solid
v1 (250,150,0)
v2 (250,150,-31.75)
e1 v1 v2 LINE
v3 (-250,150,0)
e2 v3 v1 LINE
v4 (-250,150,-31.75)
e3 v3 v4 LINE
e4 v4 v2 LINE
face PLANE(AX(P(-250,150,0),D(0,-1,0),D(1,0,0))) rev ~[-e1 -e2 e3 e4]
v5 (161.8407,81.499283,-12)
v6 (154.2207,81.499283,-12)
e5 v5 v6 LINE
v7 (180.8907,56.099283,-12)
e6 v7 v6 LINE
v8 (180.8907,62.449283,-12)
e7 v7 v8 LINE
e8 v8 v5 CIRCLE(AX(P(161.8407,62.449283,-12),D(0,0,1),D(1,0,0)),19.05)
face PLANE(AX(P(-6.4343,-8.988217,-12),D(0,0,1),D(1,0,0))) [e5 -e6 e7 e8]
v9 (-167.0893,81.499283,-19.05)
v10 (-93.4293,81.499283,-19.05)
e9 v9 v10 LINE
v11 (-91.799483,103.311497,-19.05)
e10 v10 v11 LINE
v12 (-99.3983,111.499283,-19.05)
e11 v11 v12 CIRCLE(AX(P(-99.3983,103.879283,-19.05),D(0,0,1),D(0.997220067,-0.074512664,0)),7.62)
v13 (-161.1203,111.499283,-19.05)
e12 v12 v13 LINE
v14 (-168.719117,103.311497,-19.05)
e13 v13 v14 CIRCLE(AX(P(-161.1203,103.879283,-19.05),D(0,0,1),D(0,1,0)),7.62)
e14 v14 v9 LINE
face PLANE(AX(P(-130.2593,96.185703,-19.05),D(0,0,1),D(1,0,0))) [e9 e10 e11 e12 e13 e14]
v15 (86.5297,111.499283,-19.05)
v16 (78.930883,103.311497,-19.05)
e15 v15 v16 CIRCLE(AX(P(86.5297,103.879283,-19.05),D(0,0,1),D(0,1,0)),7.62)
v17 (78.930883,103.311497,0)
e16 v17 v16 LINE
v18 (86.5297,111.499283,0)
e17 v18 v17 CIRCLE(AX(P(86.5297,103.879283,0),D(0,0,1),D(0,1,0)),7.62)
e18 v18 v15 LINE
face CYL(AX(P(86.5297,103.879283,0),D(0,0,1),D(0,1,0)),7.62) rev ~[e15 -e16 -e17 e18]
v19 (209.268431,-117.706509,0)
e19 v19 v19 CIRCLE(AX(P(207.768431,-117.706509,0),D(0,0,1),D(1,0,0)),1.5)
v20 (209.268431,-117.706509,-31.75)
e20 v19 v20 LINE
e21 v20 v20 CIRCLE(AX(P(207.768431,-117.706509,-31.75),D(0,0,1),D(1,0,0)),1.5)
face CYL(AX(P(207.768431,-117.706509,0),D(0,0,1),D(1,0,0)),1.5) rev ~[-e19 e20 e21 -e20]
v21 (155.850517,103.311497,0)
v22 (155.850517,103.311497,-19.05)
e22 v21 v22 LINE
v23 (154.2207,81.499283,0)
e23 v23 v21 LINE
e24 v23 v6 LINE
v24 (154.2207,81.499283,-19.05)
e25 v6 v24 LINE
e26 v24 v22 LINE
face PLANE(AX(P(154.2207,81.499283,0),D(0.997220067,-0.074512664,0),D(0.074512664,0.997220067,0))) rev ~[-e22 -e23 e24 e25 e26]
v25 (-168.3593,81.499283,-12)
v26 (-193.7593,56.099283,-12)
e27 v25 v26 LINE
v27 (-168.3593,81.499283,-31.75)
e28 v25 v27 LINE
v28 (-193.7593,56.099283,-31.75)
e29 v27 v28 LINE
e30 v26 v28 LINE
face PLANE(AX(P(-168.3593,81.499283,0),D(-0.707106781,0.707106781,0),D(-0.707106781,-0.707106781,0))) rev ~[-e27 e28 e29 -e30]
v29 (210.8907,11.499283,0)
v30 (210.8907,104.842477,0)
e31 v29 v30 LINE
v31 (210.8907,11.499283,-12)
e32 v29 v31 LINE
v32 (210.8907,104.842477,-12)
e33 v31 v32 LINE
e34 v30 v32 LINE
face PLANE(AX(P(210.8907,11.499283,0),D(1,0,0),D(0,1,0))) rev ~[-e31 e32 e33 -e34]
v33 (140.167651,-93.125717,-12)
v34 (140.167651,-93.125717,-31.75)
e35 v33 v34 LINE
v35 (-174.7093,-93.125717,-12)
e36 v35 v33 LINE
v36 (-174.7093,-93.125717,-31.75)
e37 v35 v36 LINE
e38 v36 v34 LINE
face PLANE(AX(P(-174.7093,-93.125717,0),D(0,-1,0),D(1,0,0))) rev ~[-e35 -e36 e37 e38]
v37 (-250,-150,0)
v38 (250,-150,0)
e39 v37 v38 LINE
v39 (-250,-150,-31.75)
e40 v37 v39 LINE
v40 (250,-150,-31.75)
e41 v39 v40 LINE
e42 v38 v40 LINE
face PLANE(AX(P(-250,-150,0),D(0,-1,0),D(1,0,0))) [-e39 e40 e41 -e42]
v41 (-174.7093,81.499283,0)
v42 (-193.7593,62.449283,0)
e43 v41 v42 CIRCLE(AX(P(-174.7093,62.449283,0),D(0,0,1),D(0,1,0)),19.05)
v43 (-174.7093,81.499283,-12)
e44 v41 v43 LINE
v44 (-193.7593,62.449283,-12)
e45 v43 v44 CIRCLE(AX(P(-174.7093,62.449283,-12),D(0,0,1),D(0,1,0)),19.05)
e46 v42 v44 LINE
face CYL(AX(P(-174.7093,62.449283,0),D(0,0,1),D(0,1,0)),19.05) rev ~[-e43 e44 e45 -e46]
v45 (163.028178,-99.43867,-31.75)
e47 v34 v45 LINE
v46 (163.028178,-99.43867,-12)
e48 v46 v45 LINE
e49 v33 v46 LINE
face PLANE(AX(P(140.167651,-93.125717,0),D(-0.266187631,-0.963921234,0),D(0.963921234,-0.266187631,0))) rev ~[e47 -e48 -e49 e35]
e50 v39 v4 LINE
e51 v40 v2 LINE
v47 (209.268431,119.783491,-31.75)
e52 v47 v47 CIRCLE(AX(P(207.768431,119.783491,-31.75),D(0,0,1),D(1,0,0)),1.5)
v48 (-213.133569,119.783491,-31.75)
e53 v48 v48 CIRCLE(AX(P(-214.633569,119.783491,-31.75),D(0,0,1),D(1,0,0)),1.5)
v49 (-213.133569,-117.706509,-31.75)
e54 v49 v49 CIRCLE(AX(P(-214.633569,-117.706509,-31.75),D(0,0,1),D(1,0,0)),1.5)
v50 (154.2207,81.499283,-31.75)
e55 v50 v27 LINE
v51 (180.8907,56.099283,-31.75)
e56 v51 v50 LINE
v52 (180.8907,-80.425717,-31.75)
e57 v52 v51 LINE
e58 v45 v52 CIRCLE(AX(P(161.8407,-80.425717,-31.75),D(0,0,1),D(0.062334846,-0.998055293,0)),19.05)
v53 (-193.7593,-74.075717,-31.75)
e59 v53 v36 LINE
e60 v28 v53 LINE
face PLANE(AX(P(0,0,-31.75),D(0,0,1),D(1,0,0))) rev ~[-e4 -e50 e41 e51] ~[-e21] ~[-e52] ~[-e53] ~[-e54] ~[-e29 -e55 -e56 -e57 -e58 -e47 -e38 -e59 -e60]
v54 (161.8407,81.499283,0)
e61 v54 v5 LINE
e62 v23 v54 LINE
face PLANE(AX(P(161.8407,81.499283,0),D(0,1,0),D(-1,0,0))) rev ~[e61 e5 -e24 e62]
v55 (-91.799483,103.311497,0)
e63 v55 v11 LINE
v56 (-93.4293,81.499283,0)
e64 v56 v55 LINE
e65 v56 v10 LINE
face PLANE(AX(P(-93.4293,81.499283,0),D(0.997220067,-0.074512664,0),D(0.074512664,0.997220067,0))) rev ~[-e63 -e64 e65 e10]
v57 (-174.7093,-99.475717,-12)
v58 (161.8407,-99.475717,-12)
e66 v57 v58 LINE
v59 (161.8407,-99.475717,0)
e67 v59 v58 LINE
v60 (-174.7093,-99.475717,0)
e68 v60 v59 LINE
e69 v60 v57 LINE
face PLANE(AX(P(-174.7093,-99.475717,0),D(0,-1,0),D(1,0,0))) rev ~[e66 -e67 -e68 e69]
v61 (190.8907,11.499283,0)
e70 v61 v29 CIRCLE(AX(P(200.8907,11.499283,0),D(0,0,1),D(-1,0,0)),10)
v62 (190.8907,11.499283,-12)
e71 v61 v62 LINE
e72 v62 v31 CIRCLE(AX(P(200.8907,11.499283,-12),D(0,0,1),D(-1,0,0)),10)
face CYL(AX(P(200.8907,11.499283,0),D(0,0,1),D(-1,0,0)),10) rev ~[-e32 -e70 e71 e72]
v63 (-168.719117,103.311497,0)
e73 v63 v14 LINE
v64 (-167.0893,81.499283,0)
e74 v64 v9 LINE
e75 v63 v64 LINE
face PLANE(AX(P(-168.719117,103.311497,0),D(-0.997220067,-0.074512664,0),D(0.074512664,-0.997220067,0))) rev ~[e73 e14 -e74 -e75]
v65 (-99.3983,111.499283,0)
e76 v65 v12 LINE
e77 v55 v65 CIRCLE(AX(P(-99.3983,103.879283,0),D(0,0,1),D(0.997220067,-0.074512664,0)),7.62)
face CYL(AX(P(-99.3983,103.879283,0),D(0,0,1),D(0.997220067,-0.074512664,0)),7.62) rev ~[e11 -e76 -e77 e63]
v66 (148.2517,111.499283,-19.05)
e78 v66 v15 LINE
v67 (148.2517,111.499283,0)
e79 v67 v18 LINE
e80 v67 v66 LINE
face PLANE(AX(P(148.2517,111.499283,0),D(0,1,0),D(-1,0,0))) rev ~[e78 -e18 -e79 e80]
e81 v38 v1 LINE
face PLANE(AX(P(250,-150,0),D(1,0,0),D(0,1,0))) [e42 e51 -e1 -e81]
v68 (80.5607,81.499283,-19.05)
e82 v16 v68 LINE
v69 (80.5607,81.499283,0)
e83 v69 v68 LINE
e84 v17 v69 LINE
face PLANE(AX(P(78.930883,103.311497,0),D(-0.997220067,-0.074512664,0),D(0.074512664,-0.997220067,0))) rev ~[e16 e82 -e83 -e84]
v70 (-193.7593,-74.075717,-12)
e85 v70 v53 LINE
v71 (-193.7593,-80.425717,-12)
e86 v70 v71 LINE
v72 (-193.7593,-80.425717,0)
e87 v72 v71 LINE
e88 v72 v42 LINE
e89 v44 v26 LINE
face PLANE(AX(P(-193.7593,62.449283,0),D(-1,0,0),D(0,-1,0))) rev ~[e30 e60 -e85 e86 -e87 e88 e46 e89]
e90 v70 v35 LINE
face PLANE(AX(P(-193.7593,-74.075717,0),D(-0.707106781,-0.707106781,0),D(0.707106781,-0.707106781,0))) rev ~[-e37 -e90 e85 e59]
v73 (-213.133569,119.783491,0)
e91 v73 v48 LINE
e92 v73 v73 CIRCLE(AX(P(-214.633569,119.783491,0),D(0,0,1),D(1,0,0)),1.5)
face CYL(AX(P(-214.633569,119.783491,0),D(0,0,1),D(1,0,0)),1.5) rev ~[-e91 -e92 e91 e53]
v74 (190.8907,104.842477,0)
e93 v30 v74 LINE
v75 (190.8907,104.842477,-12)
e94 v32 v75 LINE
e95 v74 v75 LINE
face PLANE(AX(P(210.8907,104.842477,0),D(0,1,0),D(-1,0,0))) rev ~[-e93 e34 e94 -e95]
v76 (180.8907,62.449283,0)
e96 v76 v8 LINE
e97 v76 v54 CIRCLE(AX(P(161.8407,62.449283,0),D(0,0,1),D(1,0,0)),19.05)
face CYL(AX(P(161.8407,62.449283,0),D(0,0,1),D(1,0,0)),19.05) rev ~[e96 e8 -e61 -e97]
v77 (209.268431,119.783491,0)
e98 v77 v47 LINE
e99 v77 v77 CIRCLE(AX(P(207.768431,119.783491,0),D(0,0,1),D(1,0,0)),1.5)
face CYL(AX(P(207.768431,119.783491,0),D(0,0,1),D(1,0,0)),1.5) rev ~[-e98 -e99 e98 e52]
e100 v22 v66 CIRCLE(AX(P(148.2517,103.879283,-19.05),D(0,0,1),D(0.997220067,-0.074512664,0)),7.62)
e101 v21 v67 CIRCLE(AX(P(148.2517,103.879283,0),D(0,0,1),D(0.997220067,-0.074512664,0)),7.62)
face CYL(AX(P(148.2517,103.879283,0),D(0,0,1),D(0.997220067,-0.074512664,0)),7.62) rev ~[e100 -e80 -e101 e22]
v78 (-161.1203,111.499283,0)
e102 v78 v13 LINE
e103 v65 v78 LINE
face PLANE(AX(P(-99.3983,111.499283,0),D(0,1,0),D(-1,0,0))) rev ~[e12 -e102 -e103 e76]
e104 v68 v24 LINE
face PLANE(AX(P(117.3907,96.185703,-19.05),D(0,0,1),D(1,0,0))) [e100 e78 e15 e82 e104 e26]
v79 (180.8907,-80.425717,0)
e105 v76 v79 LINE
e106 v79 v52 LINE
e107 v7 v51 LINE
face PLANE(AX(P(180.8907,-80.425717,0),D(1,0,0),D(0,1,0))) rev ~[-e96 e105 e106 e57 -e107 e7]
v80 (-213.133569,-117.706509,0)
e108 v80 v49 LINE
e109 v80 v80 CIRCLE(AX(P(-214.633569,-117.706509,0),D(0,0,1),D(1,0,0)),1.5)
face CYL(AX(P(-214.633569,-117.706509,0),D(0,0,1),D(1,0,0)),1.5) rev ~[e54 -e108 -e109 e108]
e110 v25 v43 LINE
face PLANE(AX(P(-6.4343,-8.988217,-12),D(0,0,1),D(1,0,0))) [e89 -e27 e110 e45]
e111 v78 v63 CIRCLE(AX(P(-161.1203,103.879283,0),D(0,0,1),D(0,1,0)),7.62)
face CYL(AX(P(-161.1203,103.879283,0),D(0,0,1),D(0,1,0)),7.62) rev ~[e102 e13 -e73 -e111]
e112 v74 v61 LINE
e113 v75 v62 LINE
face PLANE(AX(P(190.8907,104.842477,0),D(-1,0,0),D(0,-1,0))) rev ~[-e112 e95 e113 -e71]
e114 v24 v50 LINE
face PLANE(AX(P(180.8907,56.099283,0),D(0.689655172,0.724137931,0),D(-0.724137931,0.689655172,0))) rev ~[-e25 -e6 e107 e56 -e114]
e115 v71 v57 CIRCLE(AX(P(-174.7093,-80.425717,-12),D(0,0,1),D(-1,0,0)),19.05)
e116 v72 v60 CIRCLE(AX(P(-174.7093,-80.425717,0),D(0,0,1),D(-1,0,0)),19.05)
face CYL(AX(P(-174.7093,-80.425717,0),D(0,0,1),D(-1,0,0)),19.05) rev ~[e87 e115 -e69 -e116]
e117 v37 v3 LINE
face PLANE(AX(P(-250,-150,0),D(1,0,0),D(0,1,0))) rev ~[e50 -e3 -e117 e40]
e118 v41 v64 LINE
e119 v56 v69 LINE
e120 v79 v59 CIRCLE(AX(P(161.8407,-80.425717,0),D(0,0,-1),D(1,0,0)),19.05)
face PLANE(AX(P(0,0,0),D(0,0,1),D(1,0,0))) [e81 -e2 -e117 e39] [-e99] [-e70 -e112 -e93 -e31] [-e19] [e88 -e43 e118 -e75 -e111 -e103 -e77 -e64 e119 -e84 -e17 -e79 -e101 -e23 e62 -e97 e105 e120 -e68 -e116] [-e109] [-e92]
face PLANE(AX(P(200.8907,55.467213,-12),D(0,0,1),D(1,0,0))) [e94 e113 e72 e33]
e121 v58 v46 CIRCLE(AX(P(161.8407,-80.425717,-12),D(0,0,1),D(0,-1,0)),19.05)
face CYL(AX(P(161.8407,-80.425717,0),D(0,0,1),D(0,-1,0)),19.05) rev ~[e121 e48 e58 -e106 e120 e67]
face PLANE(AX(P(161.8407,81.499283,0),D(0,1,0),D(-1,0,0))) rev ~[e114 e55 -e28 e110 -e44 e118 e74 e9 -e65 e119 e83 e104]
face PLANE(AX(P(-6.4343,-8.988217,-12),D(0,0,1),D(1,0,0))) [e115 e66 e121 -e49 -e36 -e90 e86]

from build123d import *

# Parameters (mm, degrees)
F0_W     = 500
F0_H     = 300
F1_DEPTH = 31.75
F2_R     = 1.5
F3_DEPTH = 31.751
F5_DEPTH = 12
F8_DEPTH = 31.751
F9_DEPTH = 19.05


# Not quite as in the source:
# - a length typed as a fraction of an inch, garbled in the dataset ("3 / 203.2 mm" for 3/8 in), is restored


with BuildPart() as f1:
    # F0 (on Top) → F1 (new body)
    with BuildSketch(Plane.XY):
        Rectangle(F0_W, F0_H)
    extrude(amount=-F1_DEPTH)

    # F2 (on Top) → F3 (cut, through all)
    with BuildSketch(Plane.XY):
        with Locations((-214.6335691214, 119.7834908962)):
            Circle(F2_R)
        with Locations((-214.6335691214, -117.7065091038)):
            Circle(F2_R)
        with Locations((207.7684308786, 119.7834908962)):
            Circle(F2_R)
        with Locations((207.7684308786, -117.7065091038)):
            Circle(F2_R)
        with Locations((630.1704308786, 119.7834908962)):
            Circle(F2_R)
        with Locations((630.1704308786, -117.7065091038)):
            Circle(F2_R)
    extrude(amount=-F3_DEPTH, mode=Mode.SUBTRACT)

    # F4 (on Top) → F5 (cut)
    with BuildSketch(Plane.XY):
        with BuildLine():
            ThreePointArc((-193.759300375, -80.4257169581), (-188.1796845566, -93.8961011397), (-174.709300375, -99.4757169581))
            Line((-174.709300375, -99.4757169581), (161.840699625, -99.4757169581))
            ThreePointArc((161.840699625, -99.4757169581), (175.3110838066, -93.8961011397), (180.890699625, -80.4257169581))
            Line((180.890699625, -80.4257169581), (180.890699625, 62.4492830419))
            ThreePointArc((180.890699625, 62.4492830419), (175.3110838066, 75.9196672235), (161.840699625, 81.4992830419))
            Line((161.840699625, 81.4992830419), (-174.709300375, 81.4992830419))
            ThreePointArc((-174.709300375, 81.4992830419), (-188.1796845566, 75.9196672235), (-193.759300375, 62.4492830419))
            Line((-193.759300375, 62.4492830419), (-193.759300375, -80.4257169581))
        make_face()
        with BuildLine():
            Line((210.890699625, 104.8424765468), (190.890699625, 104.8424765468))
            Line((190.890699625, 104.8424765468), (190.890699625, 11.4992830419))
            ThreePointArc((190.890699625, 11.4992830419), (200.890699625, 1.4992830419), (210.890699625, 11.4992830419))
            Line((210.890699625, 11.4992830419), (210.890699625, 104.8424765468))
        make_face()
    extrude(amount=-F5_DEPTH, mode=Mode.SUBTRACT)

    # F7 (on face) → F8 (cut, through all)
    with BuildSketch(Plane.XY):
        with BuildLine():
            Line((-174.709300375, -93.1257169581), (140.1676505526, -93.1257169581))
            Line((140.1676505526, -93.1257169581), (163.0281784434, -99.438670281))
            ThreePointArc((163.0281784434, -99.438670281), (175.7245746513, -93.4695091312), (180.890699625, -80.4257169581))
            Line((180.890699625, -80.4257169581), (180.890699625, 56.0992830419))
            Line((180.890699625, 56.0992830419), (154.220699625, 81.4992830419))
            Line((154.220699625, 81.4992830419), (-168.359300375, 81.4992830419))
            Line((-168.359300375, 81.4992830419), (-187.409300375, 62.4492830419))
            Line((-187.409300375, 62.4492830419), (-193.759300375, 56.0992830419))
            Line((-193.759300375, 56.0992830419), (-193.759300375, -74.0757169581))
            Line((-193.759300375, -74.0757169581), (-174.709300375, -93.1257169581))
        make_face()
    extrude(amount=-F8_DEPTH, mode=Mode.SUBTRACT)

    # F6 (on Top) → F9 (cut)
    with BuildSketch(Plane.XY):
        with BuildLine():
            ThreePointArc((-161.120300375, 111.4992830419), (-166.7055905698, 109.0628082362), (-168.7191172889, 103.3114965432))
            Line((-168.7191172889, 103.3114965432), (-167.089300375, 81.4992830419))
            Line((-167.089300375, 81.4992830419), (-93.429300375, 81.4992830419))
            Line((-93.429300375, 81.4992830419), (-91.799483461, 103.3114965432))
            ThreePointArc((-91.799483461, 103.3114965432), (-93.8130101802, 109.0628082362), (-99.398300375, 111.4992830419))
            Line((-99.398300375, 111.4992830419), (-161.120300375, 111.4992830419))
        make_face()
        with BuildLine():
            Line((148.251699625, 111.4992830419), (86.529699625, 111.4992830419))
            ThreePointArc((86.529699625, 111.4992830419), (80.9444094302, 109.0628082362), (78.9308827111, 103.3114965432))
            Line((78.9308827111, 103.3114965432), (80.560699625, 81.4992830419))
            Line((80.560699625, 81.4992830419), (154.220699625, 81.4992830419))
            Line((154.220699625, 81.4992830419), (155.850516539, 103.3114965432))
            ThreePointArc((155.850516539, 103.3114965432), (153.8369898198, 109.0628082362), (148.251699625, 111.4992830419))
        make_face()
    extrude(amount=-F9_DEPTH, mode=Mode.SUBTRACT)


solid = f1.part
